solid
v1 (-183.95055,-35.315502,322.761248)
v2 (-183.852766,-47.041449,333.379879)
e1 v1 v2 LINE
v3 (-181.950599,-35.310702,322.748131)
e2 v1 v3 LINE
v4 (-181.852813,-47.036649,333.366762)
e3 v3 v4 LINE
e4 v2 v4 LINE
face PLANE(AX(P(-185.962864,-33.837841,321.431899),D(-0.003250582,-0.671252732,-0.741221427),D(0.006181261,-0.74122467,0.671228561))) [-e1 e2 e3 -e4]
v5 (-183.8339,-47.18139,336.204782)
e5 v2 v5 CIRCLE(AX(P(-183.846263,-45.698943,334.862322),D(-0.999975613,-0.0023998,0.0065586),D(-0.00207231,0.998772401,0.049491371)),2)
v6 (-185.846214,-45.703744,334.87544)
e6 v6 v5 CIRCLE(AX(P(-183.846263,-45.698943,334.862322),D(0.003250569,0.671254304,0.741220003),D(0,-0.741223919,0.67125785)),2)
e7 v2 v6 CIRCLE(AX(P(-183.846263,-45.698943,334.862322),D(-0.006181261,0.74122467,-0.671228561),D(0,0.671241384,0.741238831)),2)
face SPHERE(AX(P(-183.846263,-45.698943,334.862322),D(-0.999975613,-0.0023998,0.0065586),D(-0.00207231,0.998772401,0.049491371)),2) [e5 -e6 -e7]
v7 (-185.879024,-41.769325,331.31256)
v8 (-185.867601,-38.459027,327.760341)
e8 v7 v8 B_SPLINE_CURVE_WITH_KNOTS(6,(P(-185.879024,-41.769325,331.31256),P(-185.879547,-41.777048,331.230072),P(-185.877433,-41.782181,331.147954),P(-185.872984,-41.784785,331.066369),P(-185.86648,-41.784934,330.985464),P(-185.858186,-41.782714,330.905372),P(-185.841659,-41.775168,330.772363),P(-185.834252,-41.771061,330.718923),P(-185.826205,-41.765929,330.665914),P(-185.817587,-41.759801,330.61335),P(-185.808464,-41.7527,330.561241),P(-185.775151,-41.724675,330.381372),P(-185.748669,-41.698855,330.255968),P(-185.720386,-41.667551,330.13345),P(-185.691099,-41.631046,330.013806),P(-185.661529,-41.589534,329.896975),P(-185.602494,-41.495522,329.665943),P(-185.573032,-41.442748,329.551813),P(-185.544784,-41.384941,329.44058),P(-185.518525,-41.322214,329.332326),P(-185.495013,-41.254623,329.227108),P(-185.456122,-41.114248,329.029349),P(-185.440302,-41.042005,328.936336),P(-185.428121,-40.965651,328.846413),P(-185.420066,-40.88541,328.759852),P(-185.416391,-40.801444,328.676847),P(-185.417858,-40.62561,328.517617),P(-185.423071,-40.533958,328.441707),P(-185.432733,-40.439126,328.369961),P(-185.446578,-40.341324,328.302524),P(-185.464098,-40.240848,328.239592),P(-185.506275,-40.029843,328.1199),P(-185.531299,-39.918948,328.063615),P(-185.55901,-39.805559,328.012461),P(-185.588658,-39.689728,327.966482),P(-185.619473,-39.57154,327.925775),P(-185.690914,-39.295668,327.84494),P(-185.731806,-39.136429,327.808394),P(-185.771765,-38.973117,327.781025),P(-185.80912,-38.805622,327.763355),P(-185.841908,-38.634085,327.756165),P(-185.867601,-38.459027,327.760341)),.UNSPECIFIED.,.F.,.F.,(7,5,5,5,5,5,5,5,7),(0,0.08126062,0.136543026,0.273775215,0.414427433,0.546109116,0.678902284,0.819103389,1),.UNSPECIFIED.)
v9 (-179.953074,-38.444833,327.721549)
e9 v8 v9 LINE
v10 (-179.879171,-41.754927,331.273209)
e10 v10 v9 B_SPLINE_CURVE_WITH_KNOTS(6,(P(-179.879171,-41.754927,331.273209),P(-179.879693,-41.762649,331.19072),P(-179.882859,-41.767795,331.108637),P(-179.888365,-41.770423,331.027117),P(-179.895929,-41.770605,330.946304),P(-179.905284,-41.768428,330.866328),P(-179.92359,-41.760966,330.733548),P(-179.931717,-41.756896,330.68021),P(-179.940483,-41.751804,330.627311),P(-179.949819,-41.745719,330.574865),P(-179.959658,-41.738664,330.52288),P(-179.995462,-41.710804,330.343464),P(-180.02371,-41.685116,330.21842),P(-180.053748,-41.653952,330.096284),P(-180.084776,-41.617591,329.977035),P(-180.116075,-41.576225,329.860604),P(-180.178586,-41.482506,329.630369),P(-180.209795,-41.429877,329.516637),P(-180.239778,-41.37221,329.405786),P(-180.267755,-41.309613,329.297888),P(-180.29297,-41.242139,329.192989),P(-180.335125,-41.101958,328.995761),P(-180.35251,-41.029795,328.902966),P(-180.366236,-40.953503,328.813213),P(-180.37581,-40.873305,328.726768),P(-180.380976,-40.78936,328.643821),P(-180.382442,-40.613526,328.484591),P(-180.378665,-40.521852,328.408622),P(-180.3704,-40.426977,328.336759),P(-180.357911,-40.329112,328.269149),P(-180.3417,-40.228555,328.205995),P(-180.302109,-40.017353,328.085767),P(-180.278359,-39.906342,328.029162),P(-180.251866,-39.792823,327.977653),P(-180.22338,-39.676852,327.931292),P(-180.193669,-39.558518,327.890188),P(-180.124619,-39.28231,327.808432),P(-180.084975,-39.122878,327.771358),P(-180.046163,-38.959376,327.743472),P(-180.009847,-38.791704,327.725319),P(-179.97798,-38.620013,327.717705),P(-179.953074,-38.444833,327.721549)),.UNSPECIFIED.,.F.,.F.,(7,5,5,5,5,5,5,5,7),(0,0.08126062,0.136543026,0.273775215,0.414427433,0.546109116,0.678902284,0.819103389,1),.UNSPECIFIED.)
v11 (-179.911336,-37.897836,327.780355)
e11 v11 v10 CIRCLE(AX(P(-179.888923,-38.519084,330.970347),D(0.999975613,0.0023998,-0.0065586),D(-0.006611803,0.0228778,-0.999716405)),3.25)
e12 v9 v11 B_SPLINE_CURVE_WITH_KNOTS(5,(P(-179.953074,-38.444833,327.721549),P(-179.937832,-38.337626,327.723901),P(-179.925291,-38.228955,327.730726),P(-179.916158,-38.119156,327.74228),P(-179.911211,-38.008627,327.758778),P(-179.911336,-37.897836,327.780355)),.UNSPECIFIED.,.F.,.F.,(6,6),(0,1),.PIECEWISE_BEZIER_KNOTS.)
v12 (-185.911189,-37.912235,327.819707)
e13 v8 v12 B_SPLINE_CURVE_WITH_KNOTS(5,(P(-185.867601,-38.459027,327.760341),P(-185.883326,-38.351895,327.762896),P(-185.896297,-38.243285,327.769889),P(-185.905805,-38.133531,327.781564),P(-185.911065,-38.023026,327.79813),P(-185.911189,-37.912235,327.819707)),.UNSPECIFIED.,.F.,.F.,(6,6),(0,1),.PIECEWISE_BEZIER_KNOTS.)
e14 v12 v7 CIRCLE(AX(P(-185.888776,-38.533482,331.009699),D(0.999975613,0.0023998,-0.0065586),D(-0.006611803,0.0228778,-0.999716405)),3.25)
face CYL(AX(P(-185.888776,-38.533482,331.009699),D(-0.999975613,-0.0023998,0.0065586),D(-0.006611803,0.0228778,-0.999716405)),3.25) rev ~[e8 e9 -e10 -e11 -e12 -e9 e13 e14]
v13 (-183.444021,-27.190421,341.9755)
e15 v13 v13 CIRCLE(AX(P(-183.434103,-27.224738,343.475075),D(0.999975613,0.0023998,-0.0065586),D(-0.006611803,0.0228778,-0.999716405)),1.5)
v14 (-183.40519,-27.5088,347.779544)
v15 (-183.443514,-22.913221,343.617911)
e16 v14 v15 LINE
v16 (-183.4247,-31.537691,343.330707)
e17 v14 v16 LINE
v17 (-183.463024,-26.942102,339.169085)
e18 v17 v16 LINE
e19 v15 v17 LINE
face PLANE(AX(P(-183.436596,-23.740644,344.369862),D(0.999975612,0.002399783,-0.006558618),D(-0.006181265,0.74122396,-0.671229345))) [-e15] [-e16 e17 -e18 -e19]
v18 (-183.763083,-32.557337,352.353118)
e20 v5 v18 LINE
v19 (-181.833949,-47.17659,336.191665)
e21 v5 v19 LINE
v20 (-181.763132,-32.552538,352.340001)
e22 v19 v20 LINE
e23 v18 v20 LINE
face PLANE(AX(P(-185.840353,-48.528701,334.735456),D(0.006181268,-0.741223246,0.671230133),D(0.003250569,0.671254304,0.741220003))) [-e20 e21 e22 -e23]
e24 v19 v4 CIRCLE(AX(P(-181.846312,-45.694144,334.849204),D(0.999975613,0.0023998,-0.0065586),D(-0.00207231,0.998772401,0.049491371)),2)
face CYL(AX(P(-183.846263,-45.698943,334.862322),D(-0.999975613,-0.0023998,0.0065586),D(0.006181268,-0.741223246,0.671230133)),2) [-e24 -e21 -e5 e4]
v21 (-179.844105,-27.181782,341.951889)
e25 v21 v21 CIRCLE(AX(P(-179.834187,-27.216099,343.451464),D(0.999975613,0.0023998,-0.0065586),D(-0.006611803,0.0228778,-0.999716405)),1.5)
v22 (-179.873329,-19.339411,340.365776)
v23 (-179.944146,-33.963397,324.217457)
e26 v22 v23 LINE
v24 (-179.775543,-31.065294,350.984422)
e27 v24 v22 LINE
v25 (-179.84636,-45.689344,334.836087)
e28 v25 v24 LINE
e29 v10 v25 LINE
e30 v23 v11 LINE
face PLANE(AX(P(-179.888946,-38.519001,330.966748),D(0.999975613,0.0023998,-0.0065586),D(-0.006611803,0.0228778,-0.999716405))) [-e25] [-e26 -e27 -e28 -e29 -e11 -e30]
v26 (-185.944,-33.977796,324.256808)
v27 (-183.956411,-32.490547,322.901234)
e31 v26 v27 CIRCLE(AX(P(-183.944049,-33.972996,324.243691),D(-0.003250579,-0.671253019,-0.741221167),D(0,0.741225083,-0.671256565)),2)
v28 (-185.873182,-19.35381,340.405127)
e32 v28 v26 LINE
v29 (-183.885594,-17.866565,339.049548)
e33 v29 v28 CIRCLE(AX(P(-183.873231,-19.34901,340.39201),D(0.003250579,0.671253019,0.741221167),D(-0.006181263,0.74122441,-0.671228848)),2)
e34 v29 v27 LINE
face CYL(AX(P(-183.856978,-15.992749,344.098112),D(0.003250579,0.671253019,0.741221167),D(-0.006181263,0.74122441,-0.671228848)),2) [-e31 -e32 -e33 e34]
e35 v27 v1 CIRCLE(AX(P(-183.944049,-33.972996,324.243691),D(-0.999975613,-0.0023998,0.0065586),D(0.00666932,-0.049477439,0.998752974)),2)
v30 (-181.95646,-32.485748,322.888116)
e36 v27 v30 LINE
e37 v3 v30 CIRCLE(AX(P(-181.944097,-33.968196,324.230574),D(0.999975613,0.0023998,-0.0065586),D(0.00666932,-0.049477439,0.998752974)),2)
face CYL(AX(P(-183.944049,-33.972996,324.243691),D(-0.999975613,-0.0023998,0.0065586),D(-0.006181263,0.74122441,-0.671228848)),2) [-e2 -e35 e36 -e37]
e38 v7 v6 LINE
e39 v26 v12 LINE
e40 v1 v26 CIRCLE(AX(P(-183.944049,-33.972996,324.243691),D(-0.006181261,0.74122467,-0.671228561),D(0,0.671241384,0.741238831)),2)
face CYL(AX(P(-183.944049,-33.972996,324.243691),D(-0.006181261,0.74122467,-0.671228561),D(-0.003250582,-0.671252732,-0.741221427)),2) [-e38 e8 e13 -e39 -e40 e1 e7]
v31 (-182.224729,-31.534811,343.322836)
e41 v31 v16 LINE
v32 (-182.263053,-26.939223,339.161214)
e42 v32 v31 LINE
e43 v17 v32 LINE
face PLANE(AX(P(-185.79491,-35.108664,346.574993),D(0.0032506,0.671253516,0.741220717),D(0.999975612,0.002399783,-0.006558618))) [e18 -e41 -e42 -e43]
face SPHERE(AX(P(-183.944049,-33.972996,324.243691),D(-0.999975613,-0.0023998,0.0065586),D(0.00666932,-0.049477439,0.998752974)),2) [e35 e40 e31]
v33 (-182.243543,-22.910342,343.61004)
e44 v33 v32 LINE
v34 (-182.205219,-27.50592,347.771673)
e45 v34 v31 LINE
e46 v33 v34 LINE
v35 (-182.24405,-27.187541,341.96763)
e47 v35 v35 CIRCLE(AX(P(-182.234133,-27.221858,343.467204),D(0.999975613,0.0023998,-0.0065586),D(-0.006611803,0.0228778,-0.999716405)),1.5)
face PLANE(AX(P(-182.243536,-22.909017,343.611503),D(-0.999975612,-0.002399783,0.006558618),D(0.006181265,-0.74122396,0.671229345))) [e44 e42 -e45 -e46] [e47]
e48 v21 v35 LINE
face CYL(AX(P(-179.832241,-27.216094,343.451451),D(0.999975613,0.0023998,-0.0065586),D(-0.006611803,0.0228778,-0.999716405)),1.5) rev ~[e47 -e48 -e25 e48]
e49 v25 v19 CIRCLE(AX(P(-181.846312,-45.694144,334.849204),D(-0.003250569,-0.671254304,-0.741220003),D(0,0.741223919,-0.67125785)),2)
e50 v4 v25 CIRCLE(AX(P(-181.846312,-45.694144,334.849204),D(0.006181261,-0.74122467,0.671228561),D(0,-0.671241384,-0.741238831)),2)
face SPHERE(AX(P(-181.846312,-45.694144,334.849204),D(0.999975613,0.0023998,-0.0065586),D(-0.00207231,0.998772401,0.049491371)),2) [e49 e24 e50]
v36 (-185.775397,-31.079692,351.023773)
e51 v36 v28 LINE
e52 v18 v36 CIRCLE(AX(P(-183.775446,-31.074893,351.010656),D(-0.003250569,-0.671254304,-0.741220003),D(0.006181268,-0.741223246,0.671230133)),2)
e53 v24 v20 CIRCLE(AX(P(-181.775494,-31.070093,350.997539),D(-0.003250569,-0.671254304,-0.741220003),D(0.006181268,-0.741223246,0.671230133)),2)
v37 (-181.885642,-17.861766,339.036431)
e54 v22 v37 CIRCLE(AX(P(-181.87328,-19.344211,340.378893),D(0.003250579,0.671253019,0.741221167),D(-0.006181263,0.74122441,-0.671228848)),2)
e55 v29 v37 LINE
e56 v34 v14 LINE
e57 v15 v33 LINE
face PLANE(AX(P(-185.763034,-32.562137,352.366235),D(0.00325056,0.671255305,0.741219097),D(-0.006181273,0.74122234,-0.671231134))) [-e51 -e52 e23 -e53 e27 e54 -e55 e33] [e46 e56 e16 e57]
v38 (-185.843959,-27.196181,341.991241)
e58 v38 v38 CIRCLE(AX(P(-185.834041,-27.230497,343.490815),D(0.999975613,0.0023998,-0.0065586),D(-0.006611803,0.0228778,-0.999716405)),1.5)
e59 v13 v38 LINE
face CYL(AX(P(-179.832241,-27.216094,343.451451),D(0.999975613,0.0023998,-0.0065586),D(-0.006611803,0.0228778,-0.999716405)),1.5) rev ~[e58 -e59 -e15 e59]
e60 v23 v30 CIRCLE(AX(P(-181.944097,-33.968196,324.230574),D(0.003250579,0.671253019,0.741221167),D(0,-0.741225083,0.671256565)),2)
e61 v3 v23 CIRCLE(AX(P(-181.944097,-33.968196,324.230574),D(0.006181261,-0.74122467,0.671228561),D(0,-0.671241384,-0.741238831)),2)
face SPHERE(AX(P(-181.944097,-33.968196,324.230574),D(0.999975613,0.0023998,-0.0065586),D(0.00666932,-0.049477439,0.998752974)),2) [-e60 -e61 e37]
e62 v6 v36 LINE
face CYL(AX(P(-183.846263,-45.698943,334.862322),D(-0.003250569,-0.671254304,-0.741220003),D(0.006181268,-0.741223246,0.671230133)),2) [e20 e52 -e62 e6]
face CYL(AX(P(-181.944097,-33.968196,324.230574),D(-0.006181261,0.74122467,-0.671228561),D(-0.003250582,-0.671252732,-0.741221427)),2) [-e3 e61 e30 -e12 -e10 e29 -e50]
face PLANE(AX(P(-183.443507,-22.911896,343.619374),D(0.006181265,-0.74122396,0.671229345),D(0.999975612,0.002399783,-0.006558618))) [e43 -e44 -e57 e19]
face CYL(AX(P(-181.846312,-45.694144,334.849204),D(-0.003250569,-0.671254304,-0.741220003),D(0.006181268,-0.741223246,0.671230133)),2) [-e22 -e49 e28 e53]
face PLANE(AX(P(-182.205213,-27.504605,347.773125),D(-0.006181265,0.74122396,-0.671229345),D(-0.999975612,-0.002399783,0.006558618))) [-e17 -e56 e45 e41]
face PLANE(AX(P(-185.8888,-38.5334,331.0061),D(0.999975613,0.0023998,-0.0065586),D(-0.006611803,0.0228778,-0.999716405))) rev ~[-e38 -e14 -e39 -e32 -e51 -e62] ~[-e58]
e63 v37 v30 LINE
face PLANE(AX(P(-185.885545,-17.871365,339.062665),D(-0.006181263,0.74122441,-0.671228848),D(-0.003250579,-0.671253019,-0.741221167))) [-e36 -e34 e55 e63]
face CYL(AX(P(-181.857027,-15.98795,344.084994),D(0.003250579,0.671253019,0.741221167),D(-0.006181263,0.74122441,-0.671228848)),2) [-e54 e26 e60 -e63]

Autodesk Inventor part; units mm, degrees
ref_plane "YZ Plane" through (0, 0, 0) normal (1, 0, 0) x (0, 1, 0)
ref_plane "XZ Plane" through (0, 0, 0) normal (0, 1, 0) x (-1, 0, 0)
ref_plane "XY Plane" through (0, 0, 0) normal (0, 0, 1) x (1, 0, 0)
ref_plane "РабПлоскость1" through (-185.8888, -38.5334, 331.0061) normal (0.9999756, 0.0023998, -0.0065586) x (-0.0066118, 0.0228778, -0.9997164)
sketch "Эскиз9" plane through (-185.8888, -38.5334, 331.0061) normal (0.9999756, 0.0023998, -0.0065586) x (-0.0066118, 0.0228778, -0.9997164)
  circle A0 centre (-0.0036, 0) radius 3.25 projected
  line L0 (7.5744, -20.841) -> (-21.2183, 6.4584)
  line L1 (-21.2183, 6.4584) -> (-7.5816, 20.841)
  line L2 (-7.5816, 20.841) -> (21.2112, -6.4584)
  line L3 (21.2112, -6.4584) -> (7.5744, -20.841)
  line L4 (7.5744, -20.841) -> (-7.5816, 20.841) construction
  line L5 (-21.2183, 6.4584) -> (21.2112, -6.4584) construction
  line L6 (9.6794, 4.4753) -> (-3.9573, -9.9074)
  point P0 (330.5647, 30.5274)
extrude "Выдавливание4" add sketch "Эскиз9" along normal blind 6 contours L0 L1 L2 L6
fillet "Сопряжение2" radius 2 8 edges at (-182.8404, -48.5216, 334.7158) (-179.8019, -40.5311, 343.5115) (-185.8017, -40.5455, 343.5509) (-182.963, -33.8307, 321.4122) (-179.9244, -25.8402, 330.2079) (-185.9242, -25.8546, 330.2473) (-185.9016, -41.1833, 328.0837) (-179.9018, -41.1689, 328.0443)
sketch "Эскиз11" plane through (-185.7754, -31.0798, 351.0238) normal (0.0032506, 0.6712535, 0.7412207) x (0.9999756, 0.0023998, -0.0065586)
  line L0 (0, 17.8197) -> (6, -2)
  line L1 (6, 17.8197) -> (0, -2)
  line L2 (2.4, 11.0099) -> (3.6, 11.0099)
  line L3 (3.6, 11.0099) -> (3.6, 4.8099)
  line L4 (3.6, 4.8099) -> (2.4, 4.8099)
  line L5 (2.4, 4.8099) -> (2.4, 11.0099)
  line L6 (2.4, 11.0099) -> (3.6, 4.8099) construction
  line L7 (3.6, 11.0099) -> (2.4, 4.8099) construction
  point P0 (188.1477, 257.5062)
  point P1 (3, 7.9099)
  dimension "d31" = 1.2
  dimension "d32" = 6.2
extrude "Выдавливание6" cut sketch "Эскиз11" against normal blind 6
sketch "Эскиз12" plane through (-179.889, -38.519, 330.9668) normal (0.9999756, 0.0023998, -0.0065586) x (-0.0066118, 0.0228778, -0.9997164)
  line L0 (-16.5329, 11.4001) -> (-12.267, 15.8993) projected
  line L1 (-16.5329, 11.4001) -> (-12.1788, 7.2719) projected
  line L2 (-12.1788, 7.2719) -> (-7.913, 11.7711) projected
  line L3 (-12.267, 15.8993) -> (-7.913, 11.7711) projected
  line L4 (-12.1788, 7.2719) -> (-12.267, 15.8993)
  line L5 (-16.5329, 11.4001) -> (-7.913, 11.7711)
  circle A0 centre (-12.2229, 11.5856) radius 1.5
  point P0 (330.5647, 30.5274)
  dimension "d35" = 3
extrude "Выдавливание7" cut sketch "Эскиз12" against normal blind 6 contours A0 L4 L5 | L5 L4 A0 | A0 L5 L4 | L4 L5 A0
properties part number "хвост"
